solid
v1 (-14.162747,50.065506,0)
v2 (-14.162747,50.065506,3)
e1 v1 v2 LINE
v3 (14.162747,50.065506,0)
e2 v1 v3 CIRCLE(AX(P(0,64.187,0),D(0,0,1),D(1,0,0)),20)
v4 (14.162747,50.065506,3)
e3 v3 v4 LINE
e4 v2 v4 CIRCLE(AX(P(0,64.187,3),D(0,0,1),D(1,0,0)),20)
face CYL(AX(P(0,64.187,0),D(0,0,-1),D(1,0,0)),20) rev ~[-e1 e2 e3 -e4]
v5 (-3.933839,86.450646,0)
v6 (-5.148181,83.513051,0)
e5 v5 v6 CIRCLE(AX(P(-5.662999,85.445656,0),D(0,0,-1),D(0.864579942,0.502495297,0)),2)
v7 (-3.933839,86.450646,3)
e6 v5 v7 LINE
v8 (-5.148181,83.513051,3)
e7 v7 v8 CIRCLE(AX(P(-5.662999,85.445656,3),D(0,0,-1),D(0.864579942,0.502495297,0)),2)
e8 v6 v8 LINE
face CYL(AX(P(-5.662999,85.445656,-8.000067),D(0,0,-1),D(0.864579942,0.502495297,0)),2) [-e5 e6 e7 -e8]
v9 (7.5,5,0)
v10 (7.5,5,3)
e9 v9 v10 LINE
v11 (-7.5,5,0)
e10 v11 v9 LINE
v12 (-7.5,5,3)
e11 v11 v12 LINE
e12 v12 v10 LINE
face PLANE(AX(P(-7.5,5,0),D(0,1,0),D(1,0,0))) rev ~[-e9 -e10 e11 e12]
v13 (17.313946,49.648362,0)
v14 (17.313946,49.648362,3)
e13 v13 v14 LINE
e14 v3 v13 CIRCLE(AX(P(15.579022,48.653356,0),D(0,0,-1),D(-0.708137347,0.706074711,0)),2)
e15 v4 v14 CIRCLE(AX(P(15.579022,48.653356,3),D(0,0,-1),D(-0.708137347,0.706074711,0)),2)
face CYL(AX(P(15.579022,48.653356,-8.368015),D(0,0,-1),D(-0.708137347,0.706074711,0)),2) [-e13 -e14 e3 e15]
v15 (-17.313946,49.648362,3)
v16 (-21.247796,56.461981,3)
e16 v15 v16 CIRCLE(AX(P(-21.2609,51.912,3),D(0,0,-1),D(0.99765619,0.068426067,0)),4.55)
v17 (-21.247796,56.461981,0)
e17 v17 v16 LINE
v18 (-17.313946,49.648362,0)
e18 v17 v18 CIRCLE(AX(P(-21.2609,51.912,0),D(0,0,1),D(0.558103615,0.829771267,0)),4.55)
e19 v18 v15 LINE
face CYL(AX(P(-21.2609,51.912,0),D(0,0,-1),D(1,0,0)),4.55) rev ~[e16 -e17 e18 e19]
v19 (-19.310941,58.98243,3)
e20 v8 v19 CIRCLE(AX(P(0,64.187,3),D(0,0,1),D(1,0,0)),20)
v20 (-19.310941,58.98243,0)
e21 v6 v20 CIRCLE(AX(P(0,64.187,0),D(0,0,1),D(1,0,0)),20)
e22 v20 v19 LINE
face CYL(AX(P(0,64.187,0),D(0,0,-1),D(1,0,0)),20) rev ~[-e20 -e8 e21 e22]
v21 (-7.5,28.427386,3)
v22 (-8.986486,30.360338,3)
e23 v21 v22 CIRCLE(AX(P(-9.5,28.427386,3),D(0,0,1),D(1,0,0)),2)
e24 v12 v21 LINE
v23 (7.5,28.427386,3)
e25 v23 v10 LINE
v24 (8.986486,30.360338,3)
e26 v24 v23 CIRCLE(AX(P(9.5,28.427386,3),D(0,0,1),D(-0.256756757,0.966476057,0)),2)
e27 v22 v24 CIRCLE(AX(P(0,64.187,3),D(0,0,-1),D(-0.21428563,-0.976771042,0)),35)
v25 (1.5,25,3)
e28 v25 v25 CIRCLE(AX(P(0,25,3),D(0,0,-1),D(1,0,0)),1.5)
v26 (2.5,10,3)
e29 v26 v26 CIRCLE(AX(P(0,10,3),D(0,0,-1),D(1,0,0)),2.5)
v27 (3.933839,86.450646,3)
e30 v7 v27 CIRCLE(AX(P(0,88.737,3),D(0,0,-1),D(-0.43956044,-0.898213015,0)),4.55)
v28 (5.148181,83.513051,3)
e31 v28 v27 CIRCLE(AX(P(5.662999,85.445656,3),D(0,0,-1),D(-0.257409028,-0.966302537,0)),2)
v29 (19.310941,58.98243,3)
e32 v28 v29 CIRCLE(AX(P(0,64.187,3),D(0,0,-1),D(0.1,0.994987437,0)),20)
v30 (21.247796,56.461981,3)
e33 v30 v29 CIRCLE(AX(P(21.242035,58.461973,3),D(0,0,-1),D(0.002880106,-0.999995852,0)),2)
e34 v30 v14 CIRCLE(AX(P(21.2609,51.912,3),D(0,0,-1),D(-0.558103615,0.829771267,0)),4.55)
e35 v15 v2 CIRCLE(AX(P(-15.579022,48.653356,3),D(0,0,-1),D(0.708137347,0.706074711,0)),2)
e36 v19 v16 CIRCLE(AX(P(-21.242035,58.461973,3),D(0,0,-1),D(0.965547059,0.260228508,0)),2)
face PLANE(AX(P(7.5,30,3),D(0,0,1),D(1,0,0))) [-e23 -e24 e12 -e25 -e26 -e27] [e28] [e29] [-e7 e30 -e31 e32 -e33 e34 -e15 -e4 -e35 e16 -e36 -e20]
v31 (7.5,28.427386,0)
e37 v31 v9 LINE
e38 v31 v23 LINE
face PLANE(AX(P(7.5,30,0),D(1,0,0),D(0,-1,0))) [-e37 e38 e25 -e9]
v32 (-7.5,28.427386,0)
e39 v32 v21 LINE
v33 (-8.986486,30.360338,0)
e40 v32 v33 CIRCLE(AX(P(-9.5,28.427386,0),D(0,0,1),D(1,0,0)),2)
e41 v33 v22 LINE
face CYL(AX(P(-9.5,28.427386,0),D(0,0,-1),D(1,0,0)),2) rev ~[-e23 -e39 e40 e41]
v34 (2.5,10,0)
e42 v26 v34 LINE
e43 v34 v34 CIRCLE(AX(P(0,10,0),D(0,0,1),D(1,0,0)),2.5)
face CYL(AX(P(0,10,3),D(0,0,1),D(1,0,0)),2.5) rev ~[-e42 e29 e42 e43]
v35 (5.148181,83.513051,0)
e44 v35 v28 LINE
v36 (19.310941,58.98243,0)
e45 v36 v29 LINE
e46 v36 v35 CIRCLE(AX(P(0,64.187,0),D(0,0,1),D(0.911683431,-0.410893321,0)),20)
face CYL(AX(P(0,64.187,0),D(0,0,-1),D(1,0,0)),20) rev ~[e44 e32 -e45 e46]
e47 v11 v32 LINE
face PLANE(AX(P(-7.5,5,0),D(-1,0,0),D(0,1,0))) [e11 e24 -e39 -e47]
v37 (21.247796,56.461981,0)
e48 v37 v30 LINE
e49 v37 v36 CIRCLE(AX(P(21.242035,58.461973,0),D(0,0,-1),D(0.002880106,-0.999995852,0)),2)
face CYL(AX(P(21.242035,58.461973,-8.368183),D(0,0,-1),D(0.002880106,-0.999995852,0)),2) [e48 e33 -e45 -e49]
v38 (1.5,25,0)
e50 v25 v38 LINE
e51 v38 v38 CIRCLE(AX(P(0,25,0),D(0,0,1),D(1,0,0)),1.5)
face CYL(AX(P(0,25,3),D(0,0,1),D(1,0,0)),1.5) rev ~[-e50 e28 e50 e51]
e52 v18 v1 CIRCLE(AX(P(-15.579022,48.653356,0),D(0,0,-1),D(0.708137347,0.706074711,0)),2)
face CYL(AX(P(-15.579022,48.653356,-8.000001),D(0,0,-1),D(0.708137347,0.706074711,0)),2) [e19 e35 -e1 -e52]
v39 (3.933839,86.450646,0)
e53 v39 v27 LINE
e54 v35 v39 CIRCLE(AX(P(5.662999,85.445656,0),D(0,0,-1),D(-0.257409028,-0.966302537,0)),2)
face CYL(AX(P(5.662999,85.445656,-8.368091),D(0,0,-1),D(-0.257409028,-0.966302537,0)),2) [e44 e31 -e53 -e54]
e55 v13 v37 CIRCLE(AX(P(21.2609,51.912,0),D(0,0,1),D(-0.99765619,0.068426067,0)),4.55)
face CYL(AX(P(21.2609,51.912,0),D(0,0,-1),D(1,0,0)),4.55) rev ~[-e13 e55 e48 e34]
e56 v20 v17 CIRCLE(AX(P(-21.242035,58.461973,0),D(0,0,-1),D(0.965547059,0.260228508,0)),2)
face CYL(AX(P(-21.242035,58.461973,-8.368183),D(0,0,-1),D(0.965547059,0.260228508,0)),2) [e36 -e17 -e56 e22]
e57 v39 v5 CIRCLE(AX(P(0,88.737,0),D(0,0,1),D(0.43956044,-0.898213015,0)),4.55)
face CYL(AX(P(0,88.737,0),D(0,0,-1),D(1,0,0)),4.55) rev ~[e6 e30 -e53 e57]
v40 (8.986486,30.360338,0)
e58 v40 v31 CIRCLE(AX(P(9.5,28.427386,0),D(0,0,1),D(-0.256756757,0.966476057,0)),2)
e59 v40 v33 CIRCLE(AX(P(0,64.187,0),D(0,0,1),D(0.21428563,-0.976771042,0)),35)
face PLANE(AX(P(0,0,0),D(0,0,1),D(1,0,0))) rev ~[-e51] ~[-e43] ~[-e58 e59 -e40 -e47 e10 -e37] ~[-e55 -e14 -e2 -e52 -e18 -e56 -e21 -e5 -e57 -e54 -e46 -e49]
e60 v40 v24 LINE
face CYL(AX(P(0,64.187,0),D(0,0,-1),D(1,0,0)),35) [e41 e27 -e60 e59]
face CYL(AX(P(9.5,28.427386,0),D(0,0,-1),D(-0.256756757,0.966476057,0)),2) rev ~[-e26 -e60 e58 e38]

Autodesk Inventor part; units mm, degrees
ref_plane "YZ Plane" through (0, 0, 0) normal (1, 0, 0) x (0, 1, 0)
ref_plane "XZ Plane" through (0, 0, 0) normal (0, 1, 0) x (-1, 0, 0)
ref_plane "XY Plane" through (0, 0, 0) normal (0, 0, 1) x (1, 0, 0)
sketch "Эскиз1" plane through (0, 0, 0) normal (0, 0, 1) x (1, 0, 0)
  line L0 (17.5, 5) -> (-17.5, 5) construction
  line L1 (-17.5, 5) -> (-17.5, -5) construction
  line L2 (-17.5, -5) -> (17.5, -5) construction
  line L3 (17.5, -5) -> (17.5, 5) construction
  line L4 (17.5, 5) -> (-17.5, -5) construction
  line L5 (-17.5, 5) -> (17.5, -5) construction
  line L6 (12.8471, 5) -> (-11.1661, 5) construction
  circle A0 centre (0, 64.187) radius 35
  circle A1 centre (0, 64.187) radius 20
  line L7 (0, 64.187) -> (0, 0) construction
  circle A2 centre (0, 88.737) radius 4.55
  line L8 (-7.5, 5) -> (-7.5, 30)
  line L9 (7.5, 30) -> (7.5, 5)
  line L10 (-2, 49.2906) -> (2, 49.2906) construction
  line L11 (-7.5, 5) -> (7.5, 5)
  line L12 (-2, 85.687) -> (2, 85.687)
  line L13 (2, 85.687) -> (2, 82.687)
  line L14 (2, 82.687) -> (-2, 82.687)
  line L15 (-2, 82.687) -> (-2, 85.687)
  line L16 (-2, 85.687) -> (2, 82.687) construction
  line L17 (2, 85.687) -> (-2, 82.687) construction
  line L18 (-17.6195, 51.7049) -> (-19.6195, 55.169)
  circle A3 centre (-21.2609, 51.912) radius 4.55
  line L19 (-17.0215, 56.669) -> (-15.0215, 53.2049)
  line L20 (-19.6195, 55.169) -> (-17.0215, 56.669)
  line L21 (-15.0215, 53.2049) -> (-17.6195, 51.7049)
  line L22 (19.6195, 55.169) -> (17.6195, 51.7049)
  circle A4 centre (21.2609, 51.912) radius 4.55
  line L23 (15.0215, 53.2049) -> (17.0215, 56.669)
  line L24 (17.6195, 51.7049) -> (15.0215, 53.2049)
  line L25 (17.0215, 56.669) -> (19.6195, 55.169)
  point P0 (0, 89.2906)
  point P1 (0, 84.187)
  point P2 (-17.3205, 54.187)
  point P3 (17.3205, 54.187)
  point P4 (18.2337, 55.9692)
  point P5 (18.7216, 55.6875)
  point P6 (16.7216, 52.2234)
  point P7 (16.2337, 52.5051)
  point P8 (-16.2337, 52.5051)
  point P9 (-16.7216, 52.2234)
  point P10 (-18.7216, 55.6875)
  point P11 (-18.2337, 55.9692)
  point P12 (-2, 84.0867)
  point P13 (-2, 84.6501)
  point P14 (2, 84.6501)
  point P15 (2, 84.0867)
  dimension "d3" = 40
  dimension "d4" = 9.1
  dimension "d0" = 70
  dimension "d9" = 35
  dimension "d10" = 25
  dimension "d11" = 10
  dimension "d12" = 15
  dimension "d14" = 7.5
  dimension "d30" = 4
  dimension "d31" = 3
  dimension "d34" = 360
extrude "Выдавливание1" add sketch "Эскиз1" along normal blind 3
fillet "Сопряжение1" radius 2 14 edges at (-7.5, 30, 1.5) (7.5, 30, 1.5) (-18.2337, 55.9692, 1.5) (-18.7216, 55.6875, 1.5) (-16.2337, 52.5051, 1.5) (-16.7216, 52.2234, 1.5) (-2, 84.0867, 1.5) (-2, 84.6501, 1.5) (2, 84.0867, 1.5) (2, 84.6501, 1.5) (18.7216, 55.6875, 1.5) (18.2337, 55.9692, 1.5) (16.7216, 52.2234, 1.5) (16.2337, 52.5051, 1.5)
sketch "Эскиз2" plane through (0, 0, 3) normal (0, 0, 1) x (1, 0, 0)
  circle A0 centre (0, 25) radius 1.5
  circle A1 centre (0, 10) radius 2.5
  line L0 (0, 0) -> (0, 43.9437)
  line L1 (0, 10) -> (0, 5)
  line L2 (-7.5, 5) -> (7.5, 5) projected
  dimension "d24" = 15
  dimension "d25" = 5
  dimension "d26" = 5
  dimension "d27" = 3
extrude "Выдавливание2" cut sketch "Эскиз2" against normal blind 4
properties part number "Деталь1_мозговорот"
